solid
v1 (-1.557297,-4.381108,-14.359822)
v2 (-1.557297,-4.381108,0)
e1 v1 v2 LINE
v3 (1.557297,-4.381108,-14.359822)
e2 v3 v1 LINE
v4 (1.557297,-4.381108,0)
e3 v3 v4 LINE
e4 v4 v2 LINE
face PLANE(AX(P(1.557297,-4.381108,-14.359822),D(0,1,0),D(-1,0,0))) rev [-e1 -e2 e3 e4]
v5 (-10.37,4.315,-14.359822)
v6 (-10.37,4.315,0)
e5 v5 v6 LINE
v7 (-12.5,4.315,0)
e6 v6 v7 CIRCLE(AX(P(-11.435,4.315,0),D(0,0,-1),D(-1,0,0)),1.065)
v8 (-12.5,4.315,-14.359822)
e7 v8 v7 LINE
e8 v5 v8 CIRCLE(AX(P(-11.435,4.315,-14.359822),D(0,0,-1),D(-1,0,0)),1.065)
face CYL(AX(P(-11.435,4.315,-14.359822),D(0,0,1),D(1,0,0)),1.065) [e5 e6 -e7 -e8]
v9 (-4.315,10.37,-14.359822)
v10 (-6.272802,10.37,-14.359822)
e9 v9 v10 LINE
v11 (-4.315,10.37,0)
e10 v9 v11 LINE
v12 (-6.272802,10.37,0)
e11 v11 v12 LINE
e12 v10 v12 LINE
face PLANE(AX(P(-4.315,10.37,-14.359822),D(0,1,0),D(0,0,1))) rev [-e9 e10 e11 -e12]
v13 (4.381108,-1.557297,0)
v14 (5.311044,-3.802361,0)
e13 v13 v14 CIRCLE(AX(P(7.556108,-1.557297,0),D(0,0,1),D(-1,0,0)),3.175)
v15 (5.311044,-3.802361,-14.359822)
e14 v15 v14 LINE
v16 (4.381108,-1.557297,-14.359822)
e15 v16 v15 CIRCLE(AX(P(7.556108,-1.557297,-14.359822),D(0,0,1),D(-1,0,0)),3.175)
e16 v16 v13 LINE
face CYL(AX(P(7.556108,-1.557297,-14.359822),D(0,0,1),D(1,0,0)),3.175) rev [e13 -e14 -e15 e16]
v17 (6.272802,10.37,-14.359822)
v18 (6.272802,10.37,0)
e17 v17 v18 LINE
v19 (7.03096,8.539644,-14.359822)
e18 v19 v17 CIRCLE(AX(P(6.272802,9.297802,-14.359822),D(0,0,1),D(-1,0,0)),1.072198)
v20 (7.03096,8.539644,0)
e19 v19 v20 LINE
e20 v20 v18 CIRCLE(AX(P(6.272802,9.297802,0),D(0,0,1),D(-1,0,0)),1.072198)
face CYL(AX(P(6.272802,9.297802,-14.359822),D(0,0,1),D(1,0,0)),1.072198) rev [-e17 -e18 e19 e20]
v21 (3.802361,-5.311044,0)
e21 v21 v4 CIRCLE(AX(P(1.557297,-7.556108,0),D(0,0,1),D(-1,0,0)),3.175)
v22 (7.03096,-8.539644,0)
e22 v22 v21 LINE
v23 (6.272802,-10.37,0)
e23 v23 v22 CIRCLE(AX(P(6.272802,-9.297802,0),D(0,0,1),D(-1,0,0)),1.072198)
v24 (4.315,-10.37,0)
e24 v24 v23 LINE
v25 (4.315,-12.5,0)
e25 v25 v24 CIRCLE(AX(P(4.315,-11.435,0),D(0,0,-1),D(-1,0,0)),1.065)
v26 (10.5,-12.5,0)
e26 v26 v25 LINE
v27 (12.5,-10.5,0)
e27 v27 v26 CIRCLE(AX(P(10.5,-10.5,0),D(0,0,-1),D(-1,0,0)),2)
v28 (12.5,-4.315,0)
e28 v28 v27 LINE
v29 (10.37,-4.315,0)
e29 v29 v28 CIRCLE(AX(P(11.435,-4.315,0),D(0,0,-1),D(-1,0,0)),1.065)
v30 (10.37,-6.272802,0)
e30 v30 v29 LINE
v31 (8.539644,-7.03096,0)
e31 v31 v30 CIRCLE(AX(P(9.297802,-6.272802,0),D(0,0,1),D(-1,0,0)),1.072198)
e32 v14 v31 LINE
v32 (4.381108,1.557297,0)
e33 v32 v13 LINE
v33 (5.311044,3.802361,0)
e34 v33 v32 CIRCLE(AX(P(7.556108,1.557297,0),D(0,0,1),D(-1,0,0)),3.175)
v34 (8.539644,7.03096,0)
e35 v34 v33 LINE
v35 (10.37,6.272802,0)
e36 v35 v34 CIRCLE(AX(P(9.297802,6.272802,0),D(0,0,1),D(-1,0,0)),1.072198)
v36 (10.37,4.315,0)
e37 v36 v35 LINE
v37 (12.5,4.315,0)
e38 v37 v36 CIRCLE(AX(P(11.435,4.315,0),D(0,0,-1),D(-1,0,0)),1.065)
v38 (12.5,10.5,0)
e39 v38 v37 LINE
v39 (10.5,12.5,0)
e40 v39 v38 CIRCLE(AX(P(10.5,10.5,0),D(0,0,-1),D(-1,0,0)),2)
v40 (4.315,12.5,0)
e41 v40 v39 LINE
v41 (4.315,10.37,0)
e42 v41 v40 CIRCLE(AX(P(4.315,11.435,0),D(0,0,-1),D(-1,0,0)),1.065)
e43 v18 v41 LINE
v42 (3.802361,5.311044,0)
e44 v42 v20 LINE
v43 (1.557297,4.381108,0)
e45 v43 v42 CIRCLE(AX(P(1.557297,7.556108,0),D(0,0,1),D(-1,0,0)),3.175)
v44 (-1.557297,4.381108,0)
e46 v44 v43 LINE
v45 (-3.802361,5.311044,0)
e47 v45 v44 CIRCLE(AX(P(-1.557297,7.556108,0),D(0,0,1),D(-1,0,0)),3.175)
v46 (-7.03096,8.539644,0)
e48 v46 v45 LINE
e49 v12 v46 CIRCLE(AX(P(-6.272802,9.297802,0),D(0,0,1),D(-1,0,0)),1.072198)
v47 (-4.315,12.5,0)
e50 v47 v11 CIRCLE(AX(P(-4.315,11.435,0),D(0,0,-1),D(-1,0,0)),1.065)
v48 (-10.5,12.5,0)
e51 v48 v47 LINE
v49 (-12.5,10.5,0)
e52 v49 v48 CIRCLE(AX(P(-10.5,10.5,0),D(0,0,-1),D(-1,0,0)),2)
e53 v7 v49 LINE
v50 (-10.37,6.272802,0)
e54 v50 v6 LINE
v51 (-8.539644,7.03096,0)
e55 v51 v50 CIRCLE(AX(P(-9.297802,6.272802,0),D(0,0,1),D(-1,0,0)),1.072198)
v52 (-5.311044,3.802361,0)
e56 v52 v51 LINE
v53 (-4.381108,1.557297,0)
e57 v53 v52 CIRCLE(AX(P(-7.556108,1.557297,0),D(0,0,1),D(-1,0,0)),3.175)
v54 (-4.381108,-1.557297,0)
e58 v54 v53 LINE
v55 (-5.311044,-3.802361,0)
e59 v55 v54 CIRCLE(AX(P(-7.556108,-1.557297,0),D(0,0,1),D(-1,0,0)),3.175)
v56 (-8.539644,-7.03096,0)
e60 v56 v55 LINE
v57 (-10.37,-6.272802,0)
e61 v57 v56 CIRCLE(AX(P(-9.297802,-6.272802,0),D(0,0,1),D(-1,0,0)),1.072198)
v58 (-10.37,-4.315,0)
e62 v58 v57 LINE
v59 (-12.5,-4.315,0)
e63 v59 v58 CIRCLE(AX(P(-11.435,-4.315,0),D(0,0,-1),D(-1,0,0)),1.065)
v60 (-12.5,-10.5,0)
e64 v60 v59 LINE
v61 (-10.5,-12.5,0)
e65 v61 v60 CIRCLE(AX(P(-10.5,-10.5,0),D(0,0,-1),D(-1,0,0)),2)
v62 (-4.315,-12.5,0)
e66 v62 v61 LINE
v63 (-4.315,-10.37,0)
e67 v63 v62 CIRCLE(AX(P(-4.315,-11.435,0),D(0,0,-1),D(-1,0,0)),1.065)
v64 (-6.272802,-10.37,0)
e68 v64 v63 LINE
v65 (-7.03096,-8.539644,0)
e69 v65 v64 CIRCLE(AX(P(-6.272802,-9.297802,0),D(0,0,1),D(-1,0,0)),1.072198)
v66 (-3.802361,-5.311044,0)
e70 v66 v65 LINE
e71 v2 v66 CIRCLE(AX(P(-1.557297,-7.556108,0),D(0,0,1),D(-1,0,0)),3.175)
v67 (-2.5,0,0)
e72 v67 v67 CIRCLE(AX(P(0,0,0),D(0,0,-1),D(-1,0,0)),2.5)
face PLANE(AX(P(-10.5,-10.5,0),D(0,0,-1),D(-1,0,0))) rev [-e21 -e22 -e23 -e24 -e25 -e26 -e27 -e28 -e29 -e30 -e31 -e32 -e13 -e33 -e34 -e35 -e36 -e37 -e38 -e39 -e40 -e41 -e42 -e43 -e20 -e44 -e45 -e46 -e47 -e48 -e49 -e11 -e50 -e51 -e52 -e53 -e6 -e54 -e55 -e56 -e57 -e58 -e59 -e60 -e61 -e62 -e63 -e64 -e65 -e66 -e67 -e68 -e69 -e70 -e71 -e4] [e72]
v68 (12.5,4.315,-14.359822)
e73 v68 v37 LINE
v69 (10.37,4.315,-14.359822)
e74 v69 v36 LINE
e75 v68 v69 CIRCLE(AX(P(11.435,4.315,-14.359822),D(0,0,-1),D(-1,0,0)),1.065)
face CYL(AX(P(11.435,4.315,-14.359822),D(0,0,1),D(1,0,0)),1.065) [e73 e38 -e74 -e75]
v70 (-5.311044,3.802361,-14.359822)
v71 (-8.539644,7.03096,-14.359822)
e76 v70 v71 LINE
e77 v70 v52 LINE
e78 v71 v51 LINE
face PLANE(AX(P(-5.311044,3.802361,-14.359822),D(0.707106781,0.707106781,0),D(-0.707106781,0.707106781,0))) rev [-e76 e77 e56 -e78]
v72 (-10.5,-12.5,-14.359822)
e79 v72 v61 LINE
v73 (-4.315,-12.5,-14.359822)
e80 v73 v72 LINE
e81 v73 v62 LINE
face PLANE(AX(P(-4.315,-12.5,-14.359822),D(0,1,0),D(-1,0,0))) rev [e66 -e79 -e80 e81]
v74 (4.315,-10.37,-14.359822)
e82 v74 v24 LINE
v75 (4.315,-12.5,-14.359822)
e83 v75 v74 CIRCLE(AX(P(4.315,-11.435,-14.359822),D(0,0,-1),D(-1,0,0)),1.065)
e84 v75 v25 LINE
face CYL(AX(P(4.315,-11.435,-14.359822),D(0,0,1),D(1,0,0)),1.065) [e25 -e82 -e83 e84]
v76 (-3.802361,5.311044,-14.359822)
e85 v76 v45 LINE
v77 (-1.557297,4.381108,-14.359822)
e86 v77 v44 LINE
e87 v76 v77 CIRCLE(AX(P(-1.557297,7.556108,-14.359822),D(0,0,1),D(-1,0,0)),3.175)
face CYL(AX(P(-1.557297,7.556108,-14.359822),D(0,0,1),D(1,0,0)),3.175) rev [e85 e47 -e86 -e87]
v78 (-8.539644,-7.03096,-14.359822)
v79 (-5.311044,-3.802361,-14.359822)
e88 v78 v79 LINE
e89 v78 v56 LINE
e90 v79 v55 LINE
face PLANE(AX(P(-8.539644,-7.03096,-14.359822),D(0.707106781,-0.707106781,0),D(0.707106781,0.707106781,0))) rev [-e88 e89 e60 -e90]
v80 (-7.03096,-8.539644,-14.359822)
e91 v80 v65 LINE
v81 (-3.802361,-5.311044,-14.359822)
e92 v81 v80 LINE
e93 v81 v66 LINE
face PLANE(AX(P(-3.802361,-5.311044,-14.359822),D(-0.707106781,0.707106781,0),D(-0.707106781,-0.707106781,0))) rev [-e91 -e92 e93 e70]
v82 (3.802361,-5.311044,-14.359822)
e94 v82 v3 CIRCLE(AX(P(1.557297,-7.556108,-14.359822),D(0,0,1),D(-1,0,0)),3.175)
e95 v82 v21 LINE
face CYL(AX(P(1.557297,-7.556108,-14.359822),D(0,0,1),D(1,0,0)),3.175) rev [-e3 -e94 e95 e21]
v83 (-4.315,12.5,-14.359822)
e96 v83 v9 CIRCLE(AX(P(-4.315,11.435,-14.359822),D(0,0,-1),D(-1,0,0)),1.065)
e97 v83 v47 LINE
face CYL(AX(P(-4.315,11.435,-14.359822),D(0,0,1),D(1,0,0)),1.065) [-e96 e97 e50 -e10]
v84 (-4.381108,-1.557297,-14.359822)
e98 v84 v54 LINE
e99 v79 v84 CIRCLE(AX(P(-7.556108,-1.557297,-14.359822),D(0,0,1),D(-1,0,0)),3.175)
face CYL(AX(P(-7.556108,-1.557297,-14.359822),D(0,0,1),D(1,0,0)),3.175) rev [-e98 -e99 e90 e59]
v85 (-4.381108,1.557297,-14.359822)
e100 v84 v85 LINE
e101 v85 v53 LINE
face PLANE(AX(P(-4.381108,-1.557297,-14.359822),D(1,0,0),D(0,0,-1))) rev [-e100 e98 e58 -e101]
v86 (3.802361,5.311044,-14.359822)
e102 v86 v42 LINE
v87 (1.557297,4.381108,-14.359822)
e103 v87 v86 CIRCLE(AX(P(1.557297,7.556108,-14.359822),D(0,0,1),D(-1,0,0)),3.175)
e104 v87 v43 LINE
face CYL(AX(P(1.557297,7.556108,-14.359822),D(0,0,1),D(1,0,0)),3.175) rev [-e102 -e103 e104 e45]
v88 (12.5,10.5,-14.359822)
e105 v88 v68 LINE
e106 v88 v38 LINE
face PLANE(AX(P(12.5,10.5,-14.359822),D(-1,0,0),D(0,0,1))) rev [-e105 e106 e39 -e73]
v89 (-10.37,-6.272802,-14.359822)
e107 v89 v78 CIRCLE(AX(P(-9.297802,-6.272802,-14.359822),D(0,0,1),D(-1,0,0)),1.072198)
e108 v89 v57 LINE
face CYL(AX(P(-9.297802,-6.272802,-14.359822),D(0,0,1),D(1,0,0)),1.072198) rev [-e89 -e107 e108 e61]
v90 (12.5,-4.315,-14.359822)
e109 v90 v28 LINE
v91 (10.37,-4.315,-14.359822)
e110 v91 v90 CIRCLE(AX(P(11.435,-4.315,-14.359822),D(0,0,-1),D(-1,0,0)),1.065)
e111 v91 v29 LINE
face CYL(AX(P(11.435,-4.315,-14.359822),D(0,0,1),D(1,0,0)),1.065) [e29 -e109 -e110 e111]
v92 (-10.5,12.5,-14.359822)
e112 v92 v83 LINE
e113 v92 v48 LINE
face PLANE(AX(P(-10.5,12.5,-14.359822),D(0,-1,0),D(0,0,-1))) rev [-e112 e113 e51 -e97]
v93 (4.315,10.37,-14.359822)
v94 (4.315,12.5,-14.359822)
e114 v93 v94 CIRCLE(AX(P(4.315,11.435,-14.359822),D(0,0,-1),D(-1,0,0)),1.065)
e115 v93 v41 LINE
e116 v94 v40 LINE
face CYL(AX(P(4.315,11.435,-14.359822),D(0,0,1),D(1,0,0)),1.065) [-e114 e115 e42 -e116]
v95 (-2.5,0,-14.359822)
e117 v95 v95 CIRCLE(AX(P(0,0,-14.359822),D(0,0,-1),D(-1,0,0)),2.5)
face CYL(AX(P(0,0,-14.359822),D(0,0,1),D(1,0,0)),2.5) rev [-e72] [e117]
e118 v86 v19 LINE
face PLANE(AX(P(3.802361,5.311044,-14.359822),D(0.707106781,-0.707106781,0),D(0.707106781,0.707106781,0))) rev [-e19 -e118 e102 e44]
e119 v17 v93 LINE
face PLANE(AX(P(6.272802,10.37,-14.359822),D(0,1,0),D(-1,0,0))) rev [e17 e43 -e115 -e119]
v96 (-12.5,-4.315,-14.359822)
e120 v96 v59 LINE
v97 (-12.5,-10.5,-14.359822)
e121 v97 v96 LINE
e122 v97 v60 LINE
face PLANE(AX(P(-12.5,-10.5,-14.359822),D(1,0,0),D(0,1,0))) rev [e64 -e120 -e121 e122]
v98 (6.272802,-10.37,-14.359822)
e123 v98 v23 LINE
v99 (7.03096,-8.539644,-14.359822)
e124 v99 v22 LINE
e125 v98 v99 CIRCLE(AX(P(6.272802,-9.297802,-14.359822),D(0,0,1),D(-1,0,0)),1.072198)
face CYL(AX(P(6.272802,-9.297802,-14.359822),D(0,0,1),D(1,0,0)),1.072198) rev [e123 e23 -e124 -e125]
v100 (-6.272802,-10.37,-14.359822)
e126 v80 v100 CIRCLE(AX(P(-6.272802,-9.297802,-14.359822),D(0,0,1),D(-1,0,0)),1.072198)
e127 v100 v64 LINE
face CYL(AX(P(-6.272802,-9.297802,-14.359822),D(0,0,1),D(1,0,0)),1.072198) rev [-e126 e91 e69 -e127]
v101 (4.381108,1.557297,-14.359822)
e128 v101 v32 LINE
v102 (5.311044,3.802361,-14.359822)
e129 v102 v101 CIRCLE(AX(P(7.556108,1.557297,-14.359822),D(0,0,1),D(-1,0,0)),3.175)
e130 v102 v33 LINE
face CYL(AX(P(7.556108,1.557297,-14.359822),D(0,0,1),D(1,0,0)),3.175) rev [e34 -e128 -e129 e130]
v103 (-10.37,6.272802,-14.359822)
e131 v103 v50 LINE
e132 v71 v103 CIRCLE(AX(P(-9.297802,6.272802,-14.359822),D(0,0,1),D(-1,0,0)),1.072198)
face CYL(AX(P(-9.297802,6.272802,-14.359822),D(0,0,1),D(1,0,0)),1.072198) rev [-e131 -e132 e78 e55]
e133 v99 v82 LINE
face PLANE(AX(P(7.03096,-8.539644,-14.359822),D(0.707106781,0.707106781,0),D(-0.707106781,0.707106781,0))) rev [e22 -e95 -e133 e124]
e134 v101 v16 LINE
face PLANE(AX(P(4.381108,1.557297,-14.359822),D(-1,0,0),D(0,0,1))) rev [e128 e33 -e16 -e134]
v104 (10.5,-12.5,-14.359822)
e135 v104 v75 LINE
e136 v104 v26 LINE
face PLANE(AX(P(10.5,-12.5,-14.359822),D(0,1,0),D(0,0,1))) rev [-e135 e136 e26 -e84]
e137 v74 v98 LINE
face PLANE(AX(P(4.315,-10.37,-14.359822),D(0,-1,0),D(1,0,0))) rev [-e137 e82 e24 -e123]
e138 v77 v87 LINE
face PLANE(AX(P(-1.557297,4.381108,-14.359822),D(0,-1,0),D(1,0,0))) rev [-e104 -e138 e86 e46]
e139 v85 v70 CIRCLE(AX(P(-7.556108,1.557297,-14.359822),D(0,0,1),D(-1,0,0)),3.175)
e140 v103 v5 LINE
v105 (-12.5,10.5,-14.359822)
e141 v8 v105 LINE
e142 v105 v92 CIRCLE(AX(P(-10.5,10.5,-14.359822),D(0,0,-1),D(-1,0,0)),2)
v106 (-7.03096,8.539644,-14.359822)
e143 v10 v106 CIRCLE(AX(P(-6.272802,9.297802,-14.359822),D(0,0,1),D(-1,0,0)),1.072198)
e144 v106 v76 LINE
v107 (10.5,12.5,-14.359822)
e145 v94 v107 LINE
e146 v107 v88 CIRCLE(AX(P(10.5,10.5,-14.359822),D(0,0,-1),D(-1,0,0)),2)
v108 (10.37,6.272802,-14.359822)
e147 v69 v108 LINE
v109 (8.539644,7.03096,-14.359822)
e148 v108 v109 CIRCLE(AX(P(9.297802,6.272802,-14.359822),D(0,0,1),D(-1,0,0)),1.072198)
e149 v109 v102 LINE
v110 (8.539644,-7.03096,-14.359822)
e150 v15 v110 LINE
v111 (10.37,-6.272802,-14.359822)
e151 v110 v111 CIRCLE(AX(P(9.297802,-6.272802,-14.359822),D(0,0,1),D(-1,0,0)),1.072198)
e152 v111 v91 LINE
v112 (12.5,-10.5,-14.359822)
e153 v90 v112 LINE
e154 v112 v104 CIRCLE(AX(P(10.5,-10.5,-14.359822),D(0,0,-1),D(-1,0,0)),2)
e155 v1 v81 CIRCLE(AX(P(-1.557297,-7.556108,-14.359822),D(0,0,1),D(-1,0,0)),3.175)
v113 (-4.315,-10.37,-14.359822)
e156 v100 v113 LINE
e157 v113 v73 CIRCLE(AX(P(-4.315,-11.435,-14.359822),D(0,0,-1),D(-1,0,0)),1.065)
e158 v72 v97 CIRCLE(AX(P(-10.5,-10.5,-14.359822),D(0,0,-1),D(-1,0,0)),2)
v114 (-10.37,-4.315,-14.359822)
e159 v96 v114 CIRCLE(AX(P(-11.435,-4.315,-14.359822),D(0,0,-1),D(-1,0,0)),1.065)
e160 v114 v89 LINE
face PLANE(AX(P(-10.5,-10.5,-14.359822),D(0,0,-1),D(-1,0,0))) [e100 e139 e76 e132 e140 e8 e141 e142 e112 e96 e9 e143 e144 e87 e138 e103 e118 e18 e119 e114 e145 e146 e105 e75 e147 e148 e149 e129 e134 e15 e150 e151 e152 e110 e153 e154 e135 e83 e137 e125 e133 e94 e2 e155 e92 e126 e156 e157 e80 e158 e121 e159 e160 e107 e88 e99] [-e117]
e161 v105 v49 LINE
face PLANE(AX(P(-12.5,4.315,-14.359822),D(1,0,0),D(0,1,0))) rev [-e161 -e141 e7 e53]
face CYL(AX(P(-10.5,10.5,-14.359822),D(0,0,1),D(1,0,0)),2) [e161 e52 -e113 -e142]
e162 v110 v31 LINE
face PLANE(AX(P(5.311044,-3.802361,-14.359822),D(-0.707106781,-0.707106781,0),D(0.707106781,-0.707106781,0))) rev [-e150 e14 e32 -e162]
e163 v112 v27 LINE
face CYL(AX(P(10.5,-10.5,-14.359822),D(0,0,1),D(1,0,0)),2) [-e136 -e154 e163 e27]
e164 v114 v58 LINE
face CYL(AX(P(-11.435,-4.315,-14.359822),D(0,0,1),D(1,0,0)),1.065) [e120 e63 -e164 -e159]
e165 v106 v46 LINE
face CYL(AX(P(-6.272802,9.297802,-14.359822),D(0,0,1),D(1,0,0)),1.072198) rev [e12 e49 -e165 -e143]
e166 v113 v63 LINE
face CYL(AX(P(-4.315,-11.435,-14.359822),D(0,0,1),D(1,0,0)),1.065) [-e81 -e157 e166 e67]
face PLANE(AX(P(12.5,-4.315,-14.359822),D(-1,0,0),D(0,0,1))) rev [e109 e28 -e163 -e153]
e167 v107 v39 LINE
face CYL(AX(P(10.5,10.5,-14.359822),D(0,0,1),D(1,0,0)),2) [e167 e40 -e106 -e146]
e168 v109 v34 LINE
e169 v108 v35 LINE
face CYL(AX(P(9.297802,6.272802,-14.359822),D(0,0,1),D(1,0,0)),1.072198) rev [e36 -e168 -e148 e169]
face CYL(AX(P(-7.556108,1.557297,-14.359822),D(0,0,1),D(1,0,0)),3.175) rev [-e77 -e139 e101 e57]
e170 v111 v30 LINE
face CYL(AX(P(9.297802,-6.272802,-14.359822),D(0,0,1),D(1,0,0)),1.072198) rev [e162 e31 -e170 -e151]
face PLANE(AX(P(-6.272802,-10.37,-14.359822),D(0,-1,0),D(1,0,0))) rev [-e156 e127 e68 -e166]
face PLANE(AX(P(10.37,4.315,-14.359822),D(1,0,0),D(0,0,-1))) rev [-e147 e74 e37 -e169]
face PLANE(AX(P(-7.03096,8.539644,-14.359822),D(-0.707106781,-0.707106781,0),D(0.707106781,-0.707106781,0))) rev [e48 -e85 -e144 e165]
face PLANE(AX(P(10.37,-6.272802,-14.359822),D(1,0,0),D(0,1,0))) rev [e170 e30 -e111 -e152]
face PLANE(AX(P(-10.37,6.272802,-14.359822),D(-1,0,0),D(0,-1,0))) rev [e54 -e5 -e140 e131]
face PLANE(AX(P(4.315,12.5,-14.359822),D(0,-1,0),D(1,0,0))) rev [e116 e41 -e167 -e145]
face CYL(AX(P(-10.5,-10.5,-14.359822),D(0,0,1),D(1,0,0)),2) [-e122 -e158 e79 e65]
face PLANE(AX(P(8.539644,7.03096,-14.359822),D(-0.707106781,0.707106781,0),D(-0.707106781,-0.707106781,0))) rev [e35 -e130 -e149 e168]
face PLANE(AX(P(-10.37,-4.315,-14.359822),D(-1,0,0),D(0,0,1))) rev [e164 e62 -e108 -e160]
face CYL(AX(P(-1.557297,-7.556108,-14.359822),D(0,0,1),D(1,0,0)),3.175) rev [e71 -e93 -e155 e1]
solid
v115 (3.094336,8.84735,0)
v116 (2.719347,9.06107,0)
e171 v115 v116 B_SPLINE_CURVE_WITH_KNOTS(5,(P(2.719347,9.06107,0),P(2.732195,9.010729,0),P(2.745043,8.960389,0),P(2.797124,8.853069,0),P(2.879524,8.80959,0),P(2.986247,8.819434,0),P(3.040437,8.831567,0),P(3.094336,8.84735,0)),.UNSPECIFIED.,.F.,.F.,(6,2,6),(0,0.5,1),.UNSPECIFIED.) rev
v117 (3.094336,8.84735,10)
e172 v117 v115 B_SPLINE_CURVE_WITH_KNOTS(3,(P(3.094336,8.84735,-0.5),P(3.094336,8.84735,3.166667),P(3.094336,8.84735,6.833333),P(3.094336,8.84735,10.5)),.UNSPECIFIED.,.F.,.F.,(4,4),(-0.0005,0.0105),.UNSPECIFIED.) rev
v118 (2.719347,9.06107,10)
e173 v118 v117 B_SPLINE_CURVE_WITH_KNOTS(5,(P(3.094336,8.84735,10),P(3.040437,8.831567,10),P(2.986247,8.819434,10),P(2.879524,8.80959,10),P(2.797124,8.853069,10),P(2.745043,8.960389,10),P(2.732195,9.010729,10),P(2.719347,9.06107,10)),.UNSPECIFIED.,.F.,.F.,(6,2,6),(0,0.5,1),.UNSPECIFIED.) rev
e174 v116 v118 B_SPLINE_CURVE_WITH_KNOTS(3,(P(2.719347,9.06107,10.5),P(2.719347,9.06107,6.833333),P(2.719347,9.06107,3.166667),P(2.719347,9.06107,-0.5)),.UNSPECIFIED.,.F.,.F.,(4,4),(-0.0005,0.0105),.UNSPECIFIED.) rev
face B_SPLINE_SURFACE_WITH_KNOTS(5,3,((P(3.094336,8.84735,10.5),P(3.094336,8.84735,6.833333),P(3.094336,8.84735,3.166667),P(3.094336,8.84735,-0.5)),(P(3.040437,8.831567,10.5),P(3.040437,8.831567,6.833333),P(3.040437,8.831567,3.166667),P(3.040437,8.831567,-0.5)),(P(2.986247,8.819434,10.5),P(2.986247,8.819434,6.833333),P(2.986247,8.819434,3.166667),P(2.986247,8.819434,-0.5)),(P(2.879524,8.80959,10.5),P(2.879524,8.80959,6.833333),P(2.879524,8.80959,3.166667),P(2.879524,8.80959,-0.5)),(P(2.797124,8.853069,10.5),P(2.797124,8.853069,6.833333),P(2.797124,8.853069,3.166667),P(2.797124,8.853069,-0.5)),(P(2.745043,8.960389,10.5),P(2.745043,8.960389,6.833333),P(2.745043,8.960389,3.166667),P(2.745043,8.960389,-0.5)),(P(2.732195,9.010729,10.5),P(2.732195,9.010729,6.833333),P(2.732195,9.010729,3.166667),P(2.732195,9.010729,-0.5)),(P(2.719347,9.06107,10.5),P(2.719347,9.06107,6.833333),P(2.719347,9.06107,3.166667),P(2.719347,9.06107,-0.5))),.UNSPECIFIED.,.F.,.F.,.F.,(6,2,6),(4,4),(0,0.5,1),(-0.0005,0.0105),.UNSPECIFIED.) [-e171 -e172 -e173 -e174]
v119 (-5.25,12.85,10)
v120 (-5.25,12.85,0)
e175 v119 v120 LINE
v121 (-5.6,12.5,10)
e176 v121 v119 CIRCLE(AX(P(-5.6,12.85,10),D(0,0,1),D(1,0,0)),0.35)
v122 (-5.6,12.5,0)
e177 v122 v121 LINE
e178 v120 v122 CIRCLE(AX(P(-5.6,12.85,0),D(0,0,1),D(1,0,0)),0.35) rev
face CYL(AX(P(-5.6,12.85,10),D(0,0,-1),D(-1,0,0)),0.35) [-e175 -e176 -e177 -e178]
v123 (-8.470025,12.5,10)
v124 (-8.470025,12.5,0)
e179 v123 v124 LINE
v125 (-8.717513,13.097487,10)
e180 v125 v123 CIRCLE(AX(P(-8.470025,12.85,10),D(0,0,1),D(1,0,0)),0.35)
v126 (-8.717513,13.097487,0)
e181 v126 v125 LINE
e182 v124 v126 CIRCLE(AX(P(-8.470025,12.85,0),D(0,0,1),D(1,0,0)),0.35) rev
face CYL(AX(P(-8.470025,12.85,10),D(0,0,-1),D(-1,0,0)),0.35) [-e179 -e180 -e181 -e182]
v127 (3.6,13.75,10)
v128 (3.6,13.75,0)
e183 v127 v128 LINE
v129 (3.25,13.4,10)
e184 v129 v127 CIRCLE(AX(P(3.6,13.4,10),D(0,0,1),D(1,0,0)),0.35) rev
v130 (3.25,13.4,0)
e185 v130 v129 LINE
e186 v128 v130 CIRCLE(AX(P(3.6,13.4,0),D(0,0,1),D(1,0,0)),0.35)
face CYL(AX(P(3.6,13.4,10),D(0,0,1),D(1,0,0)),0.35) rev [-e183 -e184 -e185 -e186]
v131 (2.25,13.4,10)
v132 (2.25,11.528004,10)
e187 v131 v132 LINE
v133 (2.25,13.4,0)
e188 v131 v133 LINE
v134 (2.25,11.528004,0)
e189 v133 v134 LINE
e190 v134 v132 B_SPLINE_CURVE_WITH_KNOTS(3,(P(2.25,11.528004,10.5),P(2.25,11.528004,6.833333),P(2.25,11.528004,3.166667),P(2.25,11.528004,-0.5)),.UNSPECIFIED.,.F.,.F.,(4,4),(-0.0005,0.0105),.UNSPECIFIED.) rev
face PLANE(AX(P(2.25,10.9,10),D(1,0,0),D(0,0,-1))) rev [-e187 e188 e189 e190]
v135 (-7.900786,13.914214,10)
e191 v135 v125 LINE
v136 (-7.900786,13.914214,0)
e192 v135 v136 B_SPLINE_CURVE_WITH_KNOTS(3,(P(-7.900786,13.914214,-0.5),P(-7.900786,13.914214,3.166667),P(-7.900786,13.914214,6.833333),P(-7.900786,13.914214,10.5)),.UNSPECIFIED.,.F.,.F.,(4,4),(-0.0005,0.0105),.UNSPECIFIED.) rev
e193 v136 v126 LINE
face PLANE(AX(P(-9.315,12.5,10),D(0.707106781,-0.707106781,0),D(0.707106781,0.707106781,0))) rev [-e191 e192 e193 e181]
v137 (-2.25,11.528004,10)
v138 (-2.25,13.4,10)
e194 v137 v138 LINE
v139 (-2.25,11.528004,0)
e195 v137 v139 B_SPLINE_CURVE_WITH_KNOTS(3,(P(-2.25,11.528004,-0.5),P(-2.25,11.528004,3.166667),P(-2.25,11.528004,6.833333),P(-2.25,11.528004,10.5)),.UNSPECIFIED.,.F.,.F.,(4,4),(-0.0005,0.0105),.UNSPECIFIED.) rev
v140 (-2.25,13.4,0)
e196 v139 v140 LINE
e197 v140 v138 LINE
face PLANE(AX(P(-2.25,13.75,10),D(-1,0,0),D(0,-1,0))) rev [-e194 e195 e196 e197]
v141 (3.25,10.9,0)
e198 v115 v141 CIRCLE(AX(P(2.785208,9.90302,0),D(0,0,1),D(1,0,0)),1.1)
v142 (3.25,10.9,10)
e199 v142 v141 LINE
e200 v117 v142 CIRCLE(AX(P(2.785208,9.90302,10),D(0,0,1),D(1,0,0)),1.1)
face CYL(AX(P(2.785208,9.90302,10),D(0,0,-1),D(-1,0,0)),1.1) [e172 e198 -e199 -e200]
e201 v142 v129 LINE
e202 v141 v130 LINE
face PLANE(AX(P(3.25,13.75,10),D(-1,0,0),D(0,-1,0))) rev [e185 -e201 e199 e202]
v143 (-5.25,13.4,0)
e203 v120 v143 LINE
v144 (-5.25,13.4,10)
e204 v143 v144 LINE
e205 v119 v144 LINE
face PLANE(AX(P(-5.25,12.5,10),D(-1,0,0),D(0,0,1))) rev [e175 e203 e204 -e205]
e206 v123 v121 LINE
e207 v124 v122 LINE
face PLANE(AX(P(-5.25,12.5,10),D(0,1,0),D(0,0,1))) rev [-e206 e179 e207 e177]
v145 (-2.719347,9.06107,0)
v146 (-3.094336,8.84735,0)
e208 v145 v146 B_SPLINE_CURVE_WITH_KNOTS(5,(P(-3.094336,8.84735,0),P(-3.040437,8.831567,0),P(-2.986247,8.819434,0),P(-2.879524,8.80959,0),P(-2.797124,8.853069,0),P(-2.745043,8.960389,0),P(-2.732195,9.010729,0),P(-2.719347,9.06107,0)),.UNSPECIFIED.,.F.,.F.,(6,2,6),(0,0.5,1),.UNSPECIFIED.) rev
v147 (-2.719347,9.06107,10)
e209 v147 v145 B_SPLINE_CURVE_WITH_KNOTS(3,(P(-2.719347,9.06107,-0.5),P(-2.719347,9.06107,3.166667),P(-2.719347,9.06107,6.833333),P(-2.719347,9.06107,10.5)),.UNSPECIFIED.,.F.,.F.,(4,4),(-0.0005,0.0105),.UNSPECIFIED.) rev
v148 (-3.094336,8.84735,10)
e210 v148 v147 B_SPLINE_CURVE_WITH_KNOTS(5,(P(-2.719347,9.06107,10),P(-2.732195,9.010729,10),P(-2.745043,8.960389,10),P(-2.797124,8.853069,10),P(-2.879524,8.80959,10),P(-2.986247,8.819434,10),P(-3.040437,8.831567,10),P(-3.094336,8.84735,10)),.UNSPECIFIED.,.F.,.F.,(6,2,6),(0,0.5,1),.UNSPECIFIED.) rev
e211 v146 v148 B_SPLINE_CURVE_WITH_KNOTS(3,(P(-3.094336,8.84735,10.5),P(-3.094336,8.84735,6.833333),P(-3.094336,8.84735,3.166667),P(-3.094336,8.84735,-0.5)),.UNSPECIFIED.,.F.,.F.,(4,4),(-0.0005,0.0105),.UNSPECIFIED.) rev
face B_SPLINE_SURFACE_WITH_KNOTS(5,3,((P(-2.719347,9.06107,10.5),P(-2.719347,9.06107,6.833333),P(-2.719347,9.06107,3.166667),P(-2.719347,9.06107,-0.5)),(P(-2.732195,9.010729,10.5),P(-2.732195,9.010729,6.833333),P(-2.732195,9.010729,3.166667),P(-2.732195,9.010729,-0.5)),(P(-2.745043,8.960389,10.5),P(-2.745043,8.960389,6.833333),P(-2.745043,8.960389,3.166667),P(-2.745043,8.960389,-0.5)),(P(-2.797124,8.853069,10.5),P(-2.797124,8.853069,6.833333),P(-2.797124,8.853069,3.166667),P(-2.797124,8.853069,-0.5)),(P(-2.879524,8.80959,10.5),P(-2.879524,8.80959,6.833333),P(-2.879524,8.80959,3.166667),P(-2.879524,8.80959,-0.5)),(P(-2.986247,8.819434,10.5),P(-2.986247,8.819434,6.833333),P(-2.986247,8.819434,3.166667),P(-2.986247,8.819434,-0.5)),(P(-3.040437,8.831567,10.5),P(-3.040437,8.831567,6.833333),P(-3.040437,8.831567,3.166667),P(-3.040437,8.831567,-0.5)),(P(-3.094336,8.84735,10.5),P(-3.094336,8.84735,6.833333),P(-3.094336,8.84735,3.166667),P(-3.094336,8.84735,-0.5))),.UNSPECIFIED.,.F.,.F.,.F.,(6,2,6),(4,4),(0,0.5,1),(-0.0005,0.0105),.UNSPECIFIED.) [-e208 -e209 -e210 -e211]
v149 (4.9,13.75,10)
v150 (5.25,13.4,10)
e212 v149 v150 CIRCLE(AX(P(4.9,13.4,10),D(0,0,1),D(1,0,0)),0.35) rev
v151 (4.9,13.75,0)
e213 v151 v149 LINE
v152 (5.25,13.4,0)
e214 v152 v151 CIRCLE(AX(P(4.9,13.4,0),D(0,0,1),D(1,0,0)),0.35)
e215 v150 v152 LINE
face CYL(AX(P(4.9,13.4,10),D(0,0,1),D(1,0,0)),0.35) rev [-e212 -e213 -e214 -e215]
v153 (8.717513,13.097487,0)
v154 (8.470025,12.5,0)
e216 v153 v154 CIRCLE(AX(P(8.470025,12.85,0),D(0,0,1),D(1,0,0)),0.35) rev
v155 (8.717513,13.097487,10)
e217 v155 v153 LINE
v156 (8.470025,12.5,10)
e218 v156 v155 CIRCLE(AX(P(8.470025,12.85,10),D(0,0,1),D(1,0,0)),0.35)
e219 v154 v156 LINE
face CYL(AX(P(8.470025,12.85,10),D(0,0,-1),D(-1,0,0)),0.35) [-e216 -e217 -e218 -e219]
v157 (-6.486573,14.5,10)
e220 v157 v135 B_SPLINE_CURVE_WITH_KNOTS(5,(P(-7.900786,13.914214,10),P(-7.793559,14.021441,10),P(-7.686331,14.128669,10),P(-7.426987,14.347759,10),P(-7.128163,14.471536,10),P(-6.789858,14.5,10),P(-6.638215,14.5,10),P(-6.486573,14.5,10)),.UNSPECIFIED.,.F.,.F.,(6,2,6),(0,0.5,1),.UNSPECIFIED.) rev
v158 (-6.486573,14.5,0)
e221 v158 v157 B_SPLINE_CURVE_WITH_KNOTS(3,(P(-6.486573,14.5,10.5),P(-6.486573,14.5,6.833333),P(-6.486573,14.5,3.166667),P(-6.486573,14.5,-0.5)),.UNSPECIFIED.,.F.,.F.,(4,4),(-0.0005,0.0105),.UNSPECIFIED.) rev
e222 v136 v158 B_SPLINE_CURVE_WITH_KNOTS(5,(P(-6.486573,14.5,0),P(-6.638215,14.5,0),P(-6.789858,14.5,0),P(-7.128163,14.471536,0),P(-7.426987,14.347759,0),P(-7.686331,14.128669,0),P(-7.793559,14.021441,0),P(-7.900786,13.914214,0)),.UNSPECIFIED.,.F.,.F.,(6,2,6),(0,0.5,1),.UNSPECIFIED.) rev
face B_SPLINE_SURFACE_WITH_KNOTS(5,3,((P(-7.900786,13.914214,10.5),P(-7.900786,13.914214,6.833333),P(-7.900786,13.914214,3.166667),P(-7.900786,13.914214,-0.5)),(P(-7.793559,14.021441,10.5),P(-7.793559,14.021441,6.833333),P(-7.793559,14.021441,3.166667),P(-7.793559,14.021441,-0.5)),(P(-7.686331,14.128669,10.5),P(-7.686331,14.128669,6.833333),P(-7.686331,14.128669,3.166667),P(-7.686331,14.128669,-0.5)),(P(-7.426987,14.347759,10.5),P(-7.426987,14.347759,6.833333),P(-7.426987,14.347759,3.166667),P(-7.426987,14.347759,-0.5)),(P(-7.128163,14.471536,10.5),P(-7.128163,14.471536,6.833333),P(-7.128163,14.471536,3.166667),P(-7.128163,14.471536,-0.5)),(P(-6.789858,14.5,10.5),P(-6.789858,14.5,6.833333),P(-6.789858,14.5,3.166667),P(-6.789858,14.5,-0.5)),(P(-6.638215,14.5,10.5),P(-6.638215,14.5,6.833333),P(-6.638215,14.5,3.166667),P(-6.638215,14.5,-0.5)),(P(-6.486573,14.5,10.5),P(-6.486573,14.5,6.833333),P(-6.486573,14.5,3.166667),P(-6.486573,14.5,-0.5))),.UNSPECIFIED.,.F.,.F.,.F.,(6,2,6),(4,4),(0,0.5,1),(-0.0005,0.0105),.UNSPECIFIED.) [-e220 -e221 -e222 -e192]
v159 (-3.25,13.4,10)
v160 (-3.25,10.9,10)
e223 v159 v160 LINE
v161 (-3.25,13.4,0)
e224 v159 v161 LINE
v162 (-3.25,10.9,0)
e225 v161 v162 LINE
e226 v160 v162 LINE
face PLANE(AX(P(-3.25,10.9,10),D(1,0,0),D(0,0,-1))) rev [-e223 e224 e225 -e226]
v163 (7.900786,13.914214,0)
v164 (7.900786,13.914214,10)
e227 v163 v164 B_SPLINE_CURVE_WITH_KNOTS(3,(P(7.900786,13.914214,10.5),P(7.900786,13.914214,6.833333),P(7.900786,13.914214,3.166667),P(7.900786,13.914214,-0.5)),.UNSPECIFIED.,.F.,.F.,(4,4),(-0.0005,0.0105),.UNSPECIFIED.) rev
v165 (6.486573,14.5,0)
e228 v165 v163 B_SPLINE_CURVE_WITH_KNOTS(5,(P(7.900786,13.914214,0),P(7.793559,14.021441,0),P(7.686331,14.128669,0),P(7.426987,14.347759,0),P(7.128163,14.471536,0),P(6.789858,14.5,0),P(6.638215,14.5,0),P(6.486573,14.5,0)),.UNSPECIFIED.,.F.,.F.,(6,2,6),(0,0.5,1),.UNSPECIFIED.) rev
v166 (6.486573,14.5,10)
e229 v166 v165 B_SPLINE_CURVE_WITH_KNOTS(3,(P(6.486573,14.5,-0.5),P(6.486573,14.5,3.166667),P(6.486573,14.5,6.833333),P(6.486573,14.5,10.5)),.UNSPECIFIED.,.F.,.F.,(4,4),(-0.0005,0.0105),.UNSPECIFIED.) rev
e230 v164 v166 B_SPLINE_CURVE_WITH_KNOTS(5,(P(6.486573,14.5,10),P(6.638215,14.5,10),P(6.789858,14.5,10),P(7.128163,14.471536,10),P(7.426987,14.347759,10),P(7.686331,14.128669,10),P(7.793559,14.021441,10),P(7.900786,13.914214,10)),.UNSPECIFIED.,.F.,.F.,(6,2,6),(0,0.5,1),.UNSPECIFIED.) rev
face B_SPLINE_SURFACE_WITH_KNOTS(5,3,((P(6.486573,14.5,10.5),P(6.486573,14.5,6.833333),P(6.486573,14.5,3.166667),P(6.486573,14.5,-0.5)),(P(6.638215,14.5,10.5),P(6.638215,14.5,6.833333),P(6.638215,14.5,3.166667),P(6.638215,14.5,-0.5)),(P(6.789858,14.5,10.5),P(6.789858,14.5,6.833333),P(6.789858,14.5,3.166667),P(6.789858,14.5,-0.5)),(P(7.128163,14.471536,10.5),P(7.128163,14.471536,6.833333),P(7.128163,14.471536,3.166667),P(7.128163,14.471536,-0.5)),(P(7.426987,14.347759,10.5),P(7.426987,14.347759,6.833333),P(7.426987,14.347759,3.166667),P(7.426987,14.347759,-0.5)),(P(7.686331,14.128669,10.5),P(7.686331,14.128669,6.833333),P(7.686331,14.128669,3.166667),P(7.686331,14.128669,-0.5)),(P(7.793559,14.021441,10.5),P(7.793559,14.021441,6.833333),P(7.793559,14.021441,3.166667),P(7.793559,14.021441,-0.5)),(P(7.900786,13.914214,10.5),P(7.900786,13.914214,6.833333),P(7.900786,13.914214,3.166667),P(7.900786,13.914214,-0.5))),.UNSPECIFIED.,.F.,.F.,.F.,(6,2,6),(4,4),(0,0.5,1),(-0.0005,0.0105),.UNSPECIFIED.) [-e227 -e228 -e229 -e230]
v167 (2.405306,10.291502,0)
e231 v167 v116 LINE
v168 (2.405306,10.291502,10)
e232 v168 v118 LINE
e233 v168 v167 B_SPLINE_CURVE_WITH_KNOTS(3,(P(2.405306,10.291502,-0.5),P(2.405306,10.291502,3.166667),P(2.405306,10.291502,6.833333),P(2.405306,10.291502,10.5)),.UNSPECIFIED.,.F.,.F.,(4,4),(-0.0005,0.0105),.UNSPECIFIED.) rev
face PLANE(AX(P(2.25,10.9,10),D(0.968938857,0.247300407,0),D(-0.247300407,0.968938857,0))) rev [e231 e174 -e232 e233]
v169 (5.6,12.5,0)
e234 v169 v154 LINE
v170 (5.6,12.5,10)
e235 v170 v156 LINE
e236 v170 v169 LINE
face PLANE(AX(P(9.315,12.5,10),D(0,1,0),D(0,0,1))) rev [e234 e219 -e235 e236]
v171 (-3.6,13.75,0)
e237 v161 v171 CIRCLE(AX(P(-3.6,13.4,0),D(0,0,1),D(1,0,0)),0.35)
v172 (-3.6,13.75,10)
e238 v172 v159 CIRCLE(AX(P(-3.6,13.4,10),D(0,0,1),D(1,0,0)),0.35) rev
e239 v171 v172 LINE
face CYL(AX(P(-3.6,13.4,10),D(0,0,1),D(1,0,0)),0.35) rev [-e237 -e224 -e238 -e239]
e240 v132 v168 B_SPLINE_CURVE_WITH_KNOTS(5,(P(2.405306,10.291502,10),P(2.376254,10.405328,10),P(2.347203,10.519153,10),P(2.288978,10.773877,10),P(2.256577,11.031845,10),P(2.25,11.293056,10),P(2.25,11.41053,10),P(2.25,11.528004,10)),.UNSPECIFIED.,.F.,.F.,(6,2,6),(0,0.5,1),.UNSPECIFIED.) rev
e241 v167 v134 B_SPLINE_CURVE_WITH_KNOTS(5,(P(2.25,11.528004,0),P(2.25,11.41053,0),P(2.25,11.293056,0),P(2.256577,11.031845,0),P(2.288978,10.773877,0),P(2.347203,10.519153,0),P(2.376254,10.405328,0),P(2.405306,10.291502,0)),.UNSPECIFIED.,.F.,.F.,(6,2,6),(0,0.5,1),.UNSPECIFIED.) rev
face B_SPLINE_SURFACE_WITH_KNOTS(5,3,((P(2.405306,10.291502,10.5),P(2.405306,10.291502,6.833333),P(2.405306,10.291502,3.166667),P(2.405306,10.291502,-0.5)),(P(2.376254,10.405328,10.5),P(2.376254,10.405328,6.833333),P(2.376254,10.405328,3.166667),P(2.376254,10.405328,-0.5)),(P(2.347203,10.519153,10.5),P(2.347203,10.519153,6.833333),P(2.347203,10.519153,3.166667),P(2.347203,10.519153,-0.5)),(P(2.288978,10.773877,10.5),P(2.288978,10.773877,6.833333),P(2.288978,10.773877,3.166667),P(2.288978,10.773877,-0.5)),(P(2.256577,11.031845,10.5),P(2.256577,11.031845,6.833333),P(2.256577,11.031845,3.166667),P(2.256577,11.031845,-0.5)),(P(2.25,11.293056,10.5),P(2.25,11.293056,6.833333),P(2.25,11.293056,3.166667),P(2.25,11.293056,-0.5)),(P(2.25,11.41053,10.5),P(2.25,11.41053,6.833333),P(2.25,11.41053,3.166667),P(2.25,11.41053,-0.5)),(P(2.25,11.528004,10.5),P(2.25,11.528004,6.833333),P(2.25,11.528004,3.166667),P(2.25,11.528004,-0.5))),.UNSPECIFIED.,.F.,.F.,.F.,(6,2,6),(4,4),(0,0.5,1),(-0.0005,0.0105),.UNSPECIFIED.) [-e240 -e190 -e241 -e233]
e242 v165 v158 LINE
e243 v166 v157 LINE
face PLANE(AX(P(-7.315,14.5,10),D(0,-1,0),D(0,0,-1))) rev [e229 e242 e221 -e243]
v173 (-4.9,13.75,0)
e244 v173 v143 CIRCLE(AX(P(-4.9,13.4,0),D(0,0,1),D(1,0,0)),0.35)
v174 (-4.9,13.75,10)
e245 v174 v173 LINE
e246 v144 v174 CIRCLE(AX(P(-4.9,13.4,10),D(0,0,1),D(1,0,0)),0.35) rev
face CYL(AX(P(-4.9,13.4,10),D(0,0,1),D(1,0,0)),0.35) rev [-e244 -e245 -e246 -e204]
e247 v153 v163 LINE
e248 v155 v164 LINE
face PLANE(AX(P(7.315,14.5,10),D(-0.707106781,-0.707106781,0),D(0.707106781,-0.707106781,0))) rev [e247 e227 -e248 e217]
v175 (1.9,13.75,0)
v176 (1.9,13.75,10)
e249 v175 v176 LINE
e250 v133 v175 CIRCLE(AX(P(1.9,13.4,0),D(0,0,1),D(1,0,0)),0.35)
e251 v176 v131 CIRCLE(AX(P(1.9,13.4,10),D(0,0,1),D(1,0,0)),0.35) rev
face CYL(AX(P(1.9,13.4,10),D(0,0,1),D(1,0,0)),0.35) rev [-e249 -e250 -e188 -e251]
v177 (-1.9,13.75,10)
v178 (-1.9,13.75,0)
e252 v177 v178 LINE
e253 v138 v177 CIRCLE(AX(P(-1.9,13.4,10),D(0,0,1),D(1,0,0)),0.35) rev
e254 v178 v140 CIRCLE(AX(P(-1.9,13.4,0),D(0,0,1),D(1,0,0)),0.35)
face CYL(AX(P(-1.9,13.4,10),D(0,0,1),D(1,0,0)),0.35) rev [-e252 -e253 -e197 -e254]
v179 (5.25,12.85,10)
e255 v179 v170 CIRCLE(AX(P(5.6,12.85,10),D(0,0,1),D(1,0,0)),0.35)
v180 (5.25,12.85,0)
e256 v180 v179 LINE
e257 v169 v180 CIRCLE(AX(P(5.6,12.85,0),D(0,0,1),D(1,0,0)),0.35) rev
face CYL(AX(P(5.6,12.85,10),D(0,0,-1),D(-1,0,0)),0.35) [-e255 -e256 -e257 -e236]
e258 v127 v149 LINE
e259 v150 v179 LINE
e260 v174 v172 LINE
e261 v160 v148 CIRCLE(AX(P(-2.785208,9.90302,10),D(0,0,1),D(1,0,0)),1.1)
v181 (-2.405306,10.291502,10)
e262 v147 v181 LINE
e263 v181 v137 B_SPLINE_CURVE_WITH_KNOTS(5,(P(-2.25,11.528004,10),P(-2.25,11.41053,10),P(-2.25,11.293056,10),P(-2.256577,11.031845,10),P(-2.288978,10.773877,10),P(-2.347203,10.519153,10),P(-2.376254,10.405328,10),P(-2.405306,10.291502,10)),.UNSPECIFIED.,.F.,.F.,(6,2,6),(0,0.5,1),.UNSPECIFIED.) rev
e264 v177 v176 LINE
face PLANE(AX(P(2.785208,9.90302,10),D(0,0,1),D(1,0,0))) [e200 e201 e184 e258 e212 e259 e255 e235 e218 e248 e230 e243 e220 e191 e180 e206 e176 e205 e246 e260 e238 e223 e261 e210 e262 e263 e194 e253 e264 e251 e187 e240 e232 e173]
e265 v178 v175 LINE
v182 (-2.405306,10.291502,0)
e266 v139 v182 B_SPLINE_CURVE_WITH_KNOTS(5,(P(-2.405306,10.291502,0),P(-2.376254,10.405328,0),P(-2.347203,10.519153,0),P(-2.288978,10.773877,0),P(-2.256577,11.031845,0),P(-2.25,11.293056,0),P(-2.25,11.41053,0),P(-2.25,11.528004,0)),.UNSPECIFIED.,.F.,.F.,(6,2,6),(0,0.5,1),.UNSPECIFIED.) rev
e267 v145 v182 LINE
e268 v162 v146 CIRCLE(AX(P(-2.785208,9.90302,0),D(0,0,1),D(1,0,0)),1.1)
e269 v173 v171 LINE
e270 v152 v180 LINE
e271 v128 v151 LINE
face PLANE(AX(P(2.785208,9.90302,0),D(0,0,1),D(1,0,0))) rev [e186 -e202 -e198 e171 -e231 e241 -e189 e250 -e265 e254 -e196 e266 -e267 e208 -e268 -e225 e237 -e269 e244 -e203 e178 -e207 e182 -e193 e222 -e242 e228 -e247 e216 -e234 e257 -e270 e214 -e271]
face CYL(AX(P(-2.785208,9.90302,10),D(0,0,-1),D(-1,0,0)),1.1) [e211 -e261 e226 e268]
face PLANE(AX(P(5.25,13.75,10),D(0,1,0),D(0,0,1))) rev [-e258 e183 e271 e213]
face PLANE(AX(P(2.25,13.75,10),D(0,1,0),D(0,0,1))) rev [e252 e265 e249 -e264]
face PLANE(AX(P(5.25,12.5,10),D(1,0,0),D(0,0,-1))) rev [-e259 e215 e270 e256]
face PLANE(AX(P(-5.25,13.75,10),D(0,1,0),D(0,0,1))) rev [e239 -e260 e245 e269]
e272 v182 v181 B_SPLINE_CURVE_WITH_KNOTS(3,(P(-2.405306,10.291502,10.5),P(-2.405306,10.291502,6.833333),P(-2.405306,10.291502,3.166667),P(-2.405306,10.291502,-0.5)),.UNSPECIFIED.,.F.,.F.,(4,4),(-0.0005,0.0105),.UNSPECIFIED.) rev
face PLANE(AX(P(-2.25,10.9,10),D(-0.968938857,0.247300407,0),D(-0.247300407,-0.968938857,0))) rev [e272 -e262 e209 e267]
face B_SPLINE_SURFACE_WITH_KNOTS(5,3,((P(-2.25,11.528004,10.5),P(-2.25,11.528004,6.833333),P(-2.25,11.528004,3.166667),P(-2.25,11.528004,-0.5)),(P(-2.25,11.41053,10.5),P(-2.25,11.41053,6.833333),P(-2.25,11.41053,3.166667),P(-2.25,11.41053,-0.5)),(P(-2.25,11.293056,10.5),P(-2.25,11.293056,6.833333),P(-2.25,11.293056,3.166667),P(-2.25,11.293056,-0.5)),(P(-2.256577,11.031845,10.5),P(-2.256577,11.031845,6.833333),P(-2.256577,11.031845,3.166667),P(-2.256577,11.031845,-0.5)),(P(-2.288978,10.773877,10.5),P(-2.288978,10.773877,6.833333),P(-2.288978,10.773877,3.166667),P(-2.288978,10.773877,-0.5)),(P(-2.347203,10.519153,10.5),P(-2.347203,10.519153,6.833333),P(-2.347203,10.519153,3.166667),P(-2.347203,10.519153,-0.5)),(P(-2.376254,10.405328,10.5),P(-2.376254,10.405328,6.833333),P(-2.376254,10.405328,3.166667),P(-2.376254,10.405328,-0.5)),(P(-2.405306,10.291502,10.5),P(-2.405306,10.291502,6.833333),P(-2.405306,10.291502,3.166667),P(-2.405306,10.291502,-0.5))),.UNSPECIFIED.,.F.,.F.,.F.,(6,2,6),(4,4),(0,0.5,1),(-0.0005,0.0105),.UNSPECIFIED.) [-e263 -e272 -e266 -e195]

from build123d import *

# Parameters (mm, degrees)
SKETCH11_R                             = 2.5
F_25_SERIES_EXTRUSIONS_25_2525_1_DEPTH = 14.359821885
BOSS_EXTRUDE1_DEPTH                    = 10
FILLET1_R                              = 0.35
FILLET4_DEPTH                          = 10


with BuildPart() as part:
    # Sketch11 → 25 series extrusions 25-2525(1) (new body)
    with BuildSketch(Plane(origin=(0, 0, 0), x_dir=(-1, 0, 0), z_dir=(0, 0, -1))):
        with BuildLine():
            Line((12.5, -10.5), (12.5, -4.315))
            ThreePointArc((12.5, -4.315), (11.435, -3.25), (10.37, -4.315))
            Line((10.37, -4.315), (10.37, -6.272801987))
            ThreePointArc((10.37, -6.272801987), (9.708114403, -7.263383786), (8.539643501, -7.030960473))
            Line((8.539643501, -7.030960473), (5.311043881, -3.802360852))
            ThreePointArc((5.311043881, -3.802360852), (4.622790395, -2.77231672), (4.381107911, -1.557296822))
            Line((4.381107911, -1.557296822), (4.381107911, 1.557296822))
            ThreePointArc((4.381107911, 1.557296822), (4.622790395, 2.77231672), (5.311043881, 3.802360852))
            Line((5.311043881, 3.802360852), (8.539643501, 7.030960473))
            ThreePointArc((8.539643501, 7.030960473), (9.708114403, 7.263383786), (10.37, 6.272801987))
            Line((10.37, 6.272801987), (10.37, 4.315))
            ThreePointArc((10.37, 4.315), (11.435, 3.25), (12.5, 4.315))
            Line((12.5, 4.315), (12.5, 10.5))
            ThreePointArc((12.5, 10.5), (11.914213562, 11.914213562), (10.5, 12.5))
            Line((10.5, 12.5), (4.315, 12.5))
            ThreePointArc((4.315, 12.5), (3.25, 11.435), (4.315, 10.37))
            Line((4.315, 10.37), (6.272801987, 10.37))
            ThreePointArc((6.272801987, 10.37), (7.263383786, 9.708114403), (7.030960473, 8.539643501))
            Line((7.030960473, 8.539643501), (3.802360852, 5.311043881))
            ThreePointArc((3.802360852, 5.311043881), (2.77231672, 4.622790395), (1.557296822, 4.381107911))
            Line((1.557296822, 4.381107911), (-1.557296822, 4.381107911))
            ThreePointArc((-1.557296822, 4.381107911), (-2.77231672, 4.622790395), (-3.802360852, 5.311043881))
            Line((-3.802360852, 5.311043881), (-7.030960473, 8.539643501))
            ThreePointArc((-7.030960473, 8.539643501), (-7.263383786, 9.708114403), (-6.272801987, 10.37))
            Line((-6.272801987, 10.37), (-4.315, 10.37))
            ThreePointArc((-4.315, 10.37), (-3.25, 11.435), (-4.315, 12.5))
            Line((-4.315, 12.5), (-10.5, 12.5))
            ThreePointArc((-10.5, 12.5), (-11.914213562, 11.914213562), (-12.5, 10.5))
            Line((-12.5, 10.5), (-12.5, 4.315))
            ThreePointArc((-12.5, 4.315), (-11.435, 3.25), (-10.37, 4.315))
            Line((-10.37, 4.315), (-10.37, 6.272801987))
            ThreePointArc((-10.37, 6.272801987), (-9.708114403, 7.263383786), (-8.539643501, 7.030960473))
            Line((-8.539643501, 7.030960473), (-5.311043881, 3.802360852))
            ThreePointArc((-5.311043881, 3.802360852), (-4.622790395, 2.77231672), (-4.381107911, 1.557296822))
            Line((-4.381107911, 1.557296822), (-4.381107911, -1.557296822))
            ThreePointArc((-4.381107911, -1.557296822), (-4.622790395, -2.77231672), (-5.311043881, -3.802360852))
            Line((-5.311043881, -3.802360852), (-8.539643501, -7.030960473))
            ThreePointArc((-8.539643501, -7.030960473), (-9.708114403, -7.263383786), (-10.37, -6.272801987))
            Line((-10.37, -6.272801987), (-10.37, -4.315))
            ThreePointArc((-10.37, -4.315), (-11.435, -3.25), (-12.5, -4.315))
            Line((-12.5, -4.315), (-12.5, -10.5))
            ThreePointArc((-12.5, -10.5), (-11.914213562, -11.914213562), (-10.5, -12.5))
            Line((-10.5, -12.5), (-4.315, -12.5))
            ThreePointArc((-4.315, -12.5), (-3.25, -11.435), (-4.315, -10.37))
            Line((-4.315, -10.37), (-6.272801987, -10.37))
            ThreePointArc((-6.272801987, -10.37), (-7.263383786, -9.708114403), (-7.030960473, -8.539643501))
            Line((-7.030960473, -8.539643501), (-3.802360852, -5.311043881))
            ThreePointArc((-3.802360852, -5.311043881), (-2.77231672, -4.622790395), (-1.557296822, -4.381107911))
            Line((-1.557296822, -4.381107911), (1.557296822, -4.381107911))
            ThreePointArc((1.557296822, -4.381107911), (2.77231672, -4.622790395), (3.802360852, -5.311043881))
            Line((3.802360852, -5.311043881), (7.030960473, -8.539643501))
            ThreePointArc((7.030960473, -8.539643501), (7.263383786, -9.708114403), (6.272801987, -10.37))
            Line((6.272801987, -10.37), (4.315, -10.37))
            ThreePointArc((4.315, -10.37), (3.25, -11.435), (4.315, -12.5))
            Line((4.315, -12.5), (10.5, -12.5))
            ThreePointArc((10.5, -12.5), (11.914213562, -11.914213562), (12.5, -10.5))
        make_face()
        Circle(SKETCH11_R, mode=Mode.SUBTRACT)
    extrude(amount=F_25_SERIES_EXTRUSIONS_25_2525_1_DEPTH)


with BuildPart() as body_2:
    # Sketch14 → Boss-Extrude1 (new body)
    with BuildSketch(Plane.XY):
        with BuildLine():
            Line((-9.315, 12.5), (-7.315, 14.5))
            Line((-7.315, 14.5), (7.315, 14.5))
            Line((7.315, 14.5), (9.315, 12.5))
            Line((9.315, 12.5), (5.25, 12.5))
            Line((5.25, 12.5), (5.25, 13.75))
            Line((5.25, 13.75), (3.25, 13.75))
            Line((3.25, 13.75), (3.25, 10.9))
            ThreePointArc((3.25, 10.9), (3.859144243, 9.66498424), (2.785208105, 8.803020314))
            Line((2.785208105, 8.803020314), (2.25, 10.9))
            Line((2.25, 10.9), (2.25, 13.75))
            Line((2.25, 13.75), (-2.25, 13.75))
            Line((-2.25, 13.75), (-2.25, 10.9))
            Line((-2.25, 10.9), (-2.785208105, 8.803020314))
            ThreePointArc((-2.785208105, 8.803020314), (-3.859144243, 9.66498424), (-3.25, 10.9))
            Line((-3.25, 10.9), (-3.25, 13.75))
            Line((-3.25, 13.75), (-5.25, 13.75))
            Line((-5.25, 13.75), (-5.25, 12.5))
            Line((-5.25, 12.5), (-9.315, 12.5))
        make_face()
    extrude(amount=BOSS_EXTRUDE1_DEPTH)

    # Fillet1
    fillet1_edges = [body_2.edges().sort_by_distance(p)[0] for p in [
        (-9.315, 12.5, 5),
        (9.315, 12.5, 5),
        (5.25, 12.5, 5),
        (5.25, 13.75, 5),
        (3.25, 13.75, 5),
        (2.25, 13.75, 5),
        (-2.25, 13.75, 5),
        (-3.25, 13.75, 5),
        (-5.25, 13.75, 5),
        (-5.25, 12.5, 5),
    ]]
    fillet(fillet1_edges, radius=FILLET1_R)

    # Fillet2
    # a fillet whose section is not a circle: 2 mm, written as the material it takes off along each edge
    with BuildSketch(Plane(origin=(-7.315, 14.5, -2.071067812), x_dir=(-0.7071067811865508, -0.7071067811865444, 0), z_dir=(0, 0, 1)), Plane(origin=(7.315, 14.5, -2.071067812), x_dir=(-1, 0, 0), z_dir=(0, 0, 1))) as fillet2_piece_1:
        with BuildLine():
            add(Edge.make_bspline([(0.828427125, 0), (0.676784525, 0), (0.525141925, 0), (0.186837399, 0.028463796), (-0.111987048, 0.152240935), (-0.371331417, 0.371331417), (-0.478558927, 0.478558927), (-0.585786438, 0.585786438)], knots=[0, 0, 0, 0, 0, 0, 0.5, 0.5, 1, 1, 1, 1, 1, 1], degree=5))
            Line((-0.585786438, 0.585786438), (0, 0))
            Line((0, 0), (0.828427125, 0))
        make_face()
    extrude(amount=14.142135624, mode=Mode.SUBTRACT)

    # Fillet3
    # a fillet whose section is not a circle: 5 mm, written as the material it takes off along each edge
    with BuildSketch(Plane(origin=(2.25, 10.9, -1.570010707), x_dir=(0, 1, 0), z_dir=(0, 0, 1)), Plane(origin=(-2.25, 10.9, -1.570010707), x_dir=(-0.24730040696589287, -0.9689388570567824, 0), z_dir=(0, 0, 1))) as fillet3_piece_1:
        with BuildLine():
            add(Edge.make_bspline([(0.628004283, 0), (0.510529941, 0), (0.3930556, 0), (0.131844663, -0.006577423), (-0.126122818, -0.03897836), (-0.380846844, -0.09720281), (-0.494672298, -0.126254262), (-0.608497752, -0.155305715)], knots=[0, 0, 0, 0, 0, 0, 0.5, 0.5, 1, 1, 1, 1, 1, 1], degree=5))
            Line((-0.608497752, -0.155305715), (0, 0))
            Line((0, 0), (0.628004283, 0))
        make_face()
    extrude(amount=13.140021414, mode=Mode.SUBTRACT)

    # Fillet4: read off the stored shape, not the designer's step
    # Fillet4 outline → Fillet4 (cut)
    with BuildSketch(Plane.XY):
        with BuildLine():
            ThreePointArc((2.785208105, 8.803020314), (2.941353117, 8.814159104), (3.094335826, 8.847349886))
            add(Edge.make_bspline(
                [(3.094335826, 8.847349886), (3.040436849, 8.831566866), (2.986247473, 8.819433643), (2.879523937, 8.809590473), (2.797123937, 8.853068941), (2.74504319, 8.960389027), (2.7321949, 9.010729454), (2.719346609, 9.061069881)],
                knots=[0, 0, 0, 0, 0, 0, 0.5, 0.5, 1, 1, 1, 1, 1, 1], degree=5))
            Line((2.719346609, 9.061069881), (2.785208105, 8.803020314))
        make_face()
        with BuildLine():
            Line((-2.785208105, 8.803020314), (-2.719346609, 9.061069881))
            add(Edge.make_bspline(
                [(-2.719346609, 9.061069881), (-2.7321949, 9.010729454), (-2.74504319, 8.960389027), (-2.797123937, 8.853068941), (-2.879523937, 8.809590473), (-2.986247473, 8.819433643), (-3.040436849, 8.831566866), (-3.094335826, 8.847349886)],
                knots=[0, 0, 0, 0, 0, 0, 0.5, 0.5, 1, 1, 1, 1, 1, 1], degree=5))
            ThreePointArc((-3.094335826, 8.847349886), (-2.941353117, 8.814159104), (-2.785208105, 8.803020314))
        make_face()
    extrude(amount=FILLET4_DEPTH, mode=Mode.SUBTRACT)


solid = Compound([part.part, body_2.part])
